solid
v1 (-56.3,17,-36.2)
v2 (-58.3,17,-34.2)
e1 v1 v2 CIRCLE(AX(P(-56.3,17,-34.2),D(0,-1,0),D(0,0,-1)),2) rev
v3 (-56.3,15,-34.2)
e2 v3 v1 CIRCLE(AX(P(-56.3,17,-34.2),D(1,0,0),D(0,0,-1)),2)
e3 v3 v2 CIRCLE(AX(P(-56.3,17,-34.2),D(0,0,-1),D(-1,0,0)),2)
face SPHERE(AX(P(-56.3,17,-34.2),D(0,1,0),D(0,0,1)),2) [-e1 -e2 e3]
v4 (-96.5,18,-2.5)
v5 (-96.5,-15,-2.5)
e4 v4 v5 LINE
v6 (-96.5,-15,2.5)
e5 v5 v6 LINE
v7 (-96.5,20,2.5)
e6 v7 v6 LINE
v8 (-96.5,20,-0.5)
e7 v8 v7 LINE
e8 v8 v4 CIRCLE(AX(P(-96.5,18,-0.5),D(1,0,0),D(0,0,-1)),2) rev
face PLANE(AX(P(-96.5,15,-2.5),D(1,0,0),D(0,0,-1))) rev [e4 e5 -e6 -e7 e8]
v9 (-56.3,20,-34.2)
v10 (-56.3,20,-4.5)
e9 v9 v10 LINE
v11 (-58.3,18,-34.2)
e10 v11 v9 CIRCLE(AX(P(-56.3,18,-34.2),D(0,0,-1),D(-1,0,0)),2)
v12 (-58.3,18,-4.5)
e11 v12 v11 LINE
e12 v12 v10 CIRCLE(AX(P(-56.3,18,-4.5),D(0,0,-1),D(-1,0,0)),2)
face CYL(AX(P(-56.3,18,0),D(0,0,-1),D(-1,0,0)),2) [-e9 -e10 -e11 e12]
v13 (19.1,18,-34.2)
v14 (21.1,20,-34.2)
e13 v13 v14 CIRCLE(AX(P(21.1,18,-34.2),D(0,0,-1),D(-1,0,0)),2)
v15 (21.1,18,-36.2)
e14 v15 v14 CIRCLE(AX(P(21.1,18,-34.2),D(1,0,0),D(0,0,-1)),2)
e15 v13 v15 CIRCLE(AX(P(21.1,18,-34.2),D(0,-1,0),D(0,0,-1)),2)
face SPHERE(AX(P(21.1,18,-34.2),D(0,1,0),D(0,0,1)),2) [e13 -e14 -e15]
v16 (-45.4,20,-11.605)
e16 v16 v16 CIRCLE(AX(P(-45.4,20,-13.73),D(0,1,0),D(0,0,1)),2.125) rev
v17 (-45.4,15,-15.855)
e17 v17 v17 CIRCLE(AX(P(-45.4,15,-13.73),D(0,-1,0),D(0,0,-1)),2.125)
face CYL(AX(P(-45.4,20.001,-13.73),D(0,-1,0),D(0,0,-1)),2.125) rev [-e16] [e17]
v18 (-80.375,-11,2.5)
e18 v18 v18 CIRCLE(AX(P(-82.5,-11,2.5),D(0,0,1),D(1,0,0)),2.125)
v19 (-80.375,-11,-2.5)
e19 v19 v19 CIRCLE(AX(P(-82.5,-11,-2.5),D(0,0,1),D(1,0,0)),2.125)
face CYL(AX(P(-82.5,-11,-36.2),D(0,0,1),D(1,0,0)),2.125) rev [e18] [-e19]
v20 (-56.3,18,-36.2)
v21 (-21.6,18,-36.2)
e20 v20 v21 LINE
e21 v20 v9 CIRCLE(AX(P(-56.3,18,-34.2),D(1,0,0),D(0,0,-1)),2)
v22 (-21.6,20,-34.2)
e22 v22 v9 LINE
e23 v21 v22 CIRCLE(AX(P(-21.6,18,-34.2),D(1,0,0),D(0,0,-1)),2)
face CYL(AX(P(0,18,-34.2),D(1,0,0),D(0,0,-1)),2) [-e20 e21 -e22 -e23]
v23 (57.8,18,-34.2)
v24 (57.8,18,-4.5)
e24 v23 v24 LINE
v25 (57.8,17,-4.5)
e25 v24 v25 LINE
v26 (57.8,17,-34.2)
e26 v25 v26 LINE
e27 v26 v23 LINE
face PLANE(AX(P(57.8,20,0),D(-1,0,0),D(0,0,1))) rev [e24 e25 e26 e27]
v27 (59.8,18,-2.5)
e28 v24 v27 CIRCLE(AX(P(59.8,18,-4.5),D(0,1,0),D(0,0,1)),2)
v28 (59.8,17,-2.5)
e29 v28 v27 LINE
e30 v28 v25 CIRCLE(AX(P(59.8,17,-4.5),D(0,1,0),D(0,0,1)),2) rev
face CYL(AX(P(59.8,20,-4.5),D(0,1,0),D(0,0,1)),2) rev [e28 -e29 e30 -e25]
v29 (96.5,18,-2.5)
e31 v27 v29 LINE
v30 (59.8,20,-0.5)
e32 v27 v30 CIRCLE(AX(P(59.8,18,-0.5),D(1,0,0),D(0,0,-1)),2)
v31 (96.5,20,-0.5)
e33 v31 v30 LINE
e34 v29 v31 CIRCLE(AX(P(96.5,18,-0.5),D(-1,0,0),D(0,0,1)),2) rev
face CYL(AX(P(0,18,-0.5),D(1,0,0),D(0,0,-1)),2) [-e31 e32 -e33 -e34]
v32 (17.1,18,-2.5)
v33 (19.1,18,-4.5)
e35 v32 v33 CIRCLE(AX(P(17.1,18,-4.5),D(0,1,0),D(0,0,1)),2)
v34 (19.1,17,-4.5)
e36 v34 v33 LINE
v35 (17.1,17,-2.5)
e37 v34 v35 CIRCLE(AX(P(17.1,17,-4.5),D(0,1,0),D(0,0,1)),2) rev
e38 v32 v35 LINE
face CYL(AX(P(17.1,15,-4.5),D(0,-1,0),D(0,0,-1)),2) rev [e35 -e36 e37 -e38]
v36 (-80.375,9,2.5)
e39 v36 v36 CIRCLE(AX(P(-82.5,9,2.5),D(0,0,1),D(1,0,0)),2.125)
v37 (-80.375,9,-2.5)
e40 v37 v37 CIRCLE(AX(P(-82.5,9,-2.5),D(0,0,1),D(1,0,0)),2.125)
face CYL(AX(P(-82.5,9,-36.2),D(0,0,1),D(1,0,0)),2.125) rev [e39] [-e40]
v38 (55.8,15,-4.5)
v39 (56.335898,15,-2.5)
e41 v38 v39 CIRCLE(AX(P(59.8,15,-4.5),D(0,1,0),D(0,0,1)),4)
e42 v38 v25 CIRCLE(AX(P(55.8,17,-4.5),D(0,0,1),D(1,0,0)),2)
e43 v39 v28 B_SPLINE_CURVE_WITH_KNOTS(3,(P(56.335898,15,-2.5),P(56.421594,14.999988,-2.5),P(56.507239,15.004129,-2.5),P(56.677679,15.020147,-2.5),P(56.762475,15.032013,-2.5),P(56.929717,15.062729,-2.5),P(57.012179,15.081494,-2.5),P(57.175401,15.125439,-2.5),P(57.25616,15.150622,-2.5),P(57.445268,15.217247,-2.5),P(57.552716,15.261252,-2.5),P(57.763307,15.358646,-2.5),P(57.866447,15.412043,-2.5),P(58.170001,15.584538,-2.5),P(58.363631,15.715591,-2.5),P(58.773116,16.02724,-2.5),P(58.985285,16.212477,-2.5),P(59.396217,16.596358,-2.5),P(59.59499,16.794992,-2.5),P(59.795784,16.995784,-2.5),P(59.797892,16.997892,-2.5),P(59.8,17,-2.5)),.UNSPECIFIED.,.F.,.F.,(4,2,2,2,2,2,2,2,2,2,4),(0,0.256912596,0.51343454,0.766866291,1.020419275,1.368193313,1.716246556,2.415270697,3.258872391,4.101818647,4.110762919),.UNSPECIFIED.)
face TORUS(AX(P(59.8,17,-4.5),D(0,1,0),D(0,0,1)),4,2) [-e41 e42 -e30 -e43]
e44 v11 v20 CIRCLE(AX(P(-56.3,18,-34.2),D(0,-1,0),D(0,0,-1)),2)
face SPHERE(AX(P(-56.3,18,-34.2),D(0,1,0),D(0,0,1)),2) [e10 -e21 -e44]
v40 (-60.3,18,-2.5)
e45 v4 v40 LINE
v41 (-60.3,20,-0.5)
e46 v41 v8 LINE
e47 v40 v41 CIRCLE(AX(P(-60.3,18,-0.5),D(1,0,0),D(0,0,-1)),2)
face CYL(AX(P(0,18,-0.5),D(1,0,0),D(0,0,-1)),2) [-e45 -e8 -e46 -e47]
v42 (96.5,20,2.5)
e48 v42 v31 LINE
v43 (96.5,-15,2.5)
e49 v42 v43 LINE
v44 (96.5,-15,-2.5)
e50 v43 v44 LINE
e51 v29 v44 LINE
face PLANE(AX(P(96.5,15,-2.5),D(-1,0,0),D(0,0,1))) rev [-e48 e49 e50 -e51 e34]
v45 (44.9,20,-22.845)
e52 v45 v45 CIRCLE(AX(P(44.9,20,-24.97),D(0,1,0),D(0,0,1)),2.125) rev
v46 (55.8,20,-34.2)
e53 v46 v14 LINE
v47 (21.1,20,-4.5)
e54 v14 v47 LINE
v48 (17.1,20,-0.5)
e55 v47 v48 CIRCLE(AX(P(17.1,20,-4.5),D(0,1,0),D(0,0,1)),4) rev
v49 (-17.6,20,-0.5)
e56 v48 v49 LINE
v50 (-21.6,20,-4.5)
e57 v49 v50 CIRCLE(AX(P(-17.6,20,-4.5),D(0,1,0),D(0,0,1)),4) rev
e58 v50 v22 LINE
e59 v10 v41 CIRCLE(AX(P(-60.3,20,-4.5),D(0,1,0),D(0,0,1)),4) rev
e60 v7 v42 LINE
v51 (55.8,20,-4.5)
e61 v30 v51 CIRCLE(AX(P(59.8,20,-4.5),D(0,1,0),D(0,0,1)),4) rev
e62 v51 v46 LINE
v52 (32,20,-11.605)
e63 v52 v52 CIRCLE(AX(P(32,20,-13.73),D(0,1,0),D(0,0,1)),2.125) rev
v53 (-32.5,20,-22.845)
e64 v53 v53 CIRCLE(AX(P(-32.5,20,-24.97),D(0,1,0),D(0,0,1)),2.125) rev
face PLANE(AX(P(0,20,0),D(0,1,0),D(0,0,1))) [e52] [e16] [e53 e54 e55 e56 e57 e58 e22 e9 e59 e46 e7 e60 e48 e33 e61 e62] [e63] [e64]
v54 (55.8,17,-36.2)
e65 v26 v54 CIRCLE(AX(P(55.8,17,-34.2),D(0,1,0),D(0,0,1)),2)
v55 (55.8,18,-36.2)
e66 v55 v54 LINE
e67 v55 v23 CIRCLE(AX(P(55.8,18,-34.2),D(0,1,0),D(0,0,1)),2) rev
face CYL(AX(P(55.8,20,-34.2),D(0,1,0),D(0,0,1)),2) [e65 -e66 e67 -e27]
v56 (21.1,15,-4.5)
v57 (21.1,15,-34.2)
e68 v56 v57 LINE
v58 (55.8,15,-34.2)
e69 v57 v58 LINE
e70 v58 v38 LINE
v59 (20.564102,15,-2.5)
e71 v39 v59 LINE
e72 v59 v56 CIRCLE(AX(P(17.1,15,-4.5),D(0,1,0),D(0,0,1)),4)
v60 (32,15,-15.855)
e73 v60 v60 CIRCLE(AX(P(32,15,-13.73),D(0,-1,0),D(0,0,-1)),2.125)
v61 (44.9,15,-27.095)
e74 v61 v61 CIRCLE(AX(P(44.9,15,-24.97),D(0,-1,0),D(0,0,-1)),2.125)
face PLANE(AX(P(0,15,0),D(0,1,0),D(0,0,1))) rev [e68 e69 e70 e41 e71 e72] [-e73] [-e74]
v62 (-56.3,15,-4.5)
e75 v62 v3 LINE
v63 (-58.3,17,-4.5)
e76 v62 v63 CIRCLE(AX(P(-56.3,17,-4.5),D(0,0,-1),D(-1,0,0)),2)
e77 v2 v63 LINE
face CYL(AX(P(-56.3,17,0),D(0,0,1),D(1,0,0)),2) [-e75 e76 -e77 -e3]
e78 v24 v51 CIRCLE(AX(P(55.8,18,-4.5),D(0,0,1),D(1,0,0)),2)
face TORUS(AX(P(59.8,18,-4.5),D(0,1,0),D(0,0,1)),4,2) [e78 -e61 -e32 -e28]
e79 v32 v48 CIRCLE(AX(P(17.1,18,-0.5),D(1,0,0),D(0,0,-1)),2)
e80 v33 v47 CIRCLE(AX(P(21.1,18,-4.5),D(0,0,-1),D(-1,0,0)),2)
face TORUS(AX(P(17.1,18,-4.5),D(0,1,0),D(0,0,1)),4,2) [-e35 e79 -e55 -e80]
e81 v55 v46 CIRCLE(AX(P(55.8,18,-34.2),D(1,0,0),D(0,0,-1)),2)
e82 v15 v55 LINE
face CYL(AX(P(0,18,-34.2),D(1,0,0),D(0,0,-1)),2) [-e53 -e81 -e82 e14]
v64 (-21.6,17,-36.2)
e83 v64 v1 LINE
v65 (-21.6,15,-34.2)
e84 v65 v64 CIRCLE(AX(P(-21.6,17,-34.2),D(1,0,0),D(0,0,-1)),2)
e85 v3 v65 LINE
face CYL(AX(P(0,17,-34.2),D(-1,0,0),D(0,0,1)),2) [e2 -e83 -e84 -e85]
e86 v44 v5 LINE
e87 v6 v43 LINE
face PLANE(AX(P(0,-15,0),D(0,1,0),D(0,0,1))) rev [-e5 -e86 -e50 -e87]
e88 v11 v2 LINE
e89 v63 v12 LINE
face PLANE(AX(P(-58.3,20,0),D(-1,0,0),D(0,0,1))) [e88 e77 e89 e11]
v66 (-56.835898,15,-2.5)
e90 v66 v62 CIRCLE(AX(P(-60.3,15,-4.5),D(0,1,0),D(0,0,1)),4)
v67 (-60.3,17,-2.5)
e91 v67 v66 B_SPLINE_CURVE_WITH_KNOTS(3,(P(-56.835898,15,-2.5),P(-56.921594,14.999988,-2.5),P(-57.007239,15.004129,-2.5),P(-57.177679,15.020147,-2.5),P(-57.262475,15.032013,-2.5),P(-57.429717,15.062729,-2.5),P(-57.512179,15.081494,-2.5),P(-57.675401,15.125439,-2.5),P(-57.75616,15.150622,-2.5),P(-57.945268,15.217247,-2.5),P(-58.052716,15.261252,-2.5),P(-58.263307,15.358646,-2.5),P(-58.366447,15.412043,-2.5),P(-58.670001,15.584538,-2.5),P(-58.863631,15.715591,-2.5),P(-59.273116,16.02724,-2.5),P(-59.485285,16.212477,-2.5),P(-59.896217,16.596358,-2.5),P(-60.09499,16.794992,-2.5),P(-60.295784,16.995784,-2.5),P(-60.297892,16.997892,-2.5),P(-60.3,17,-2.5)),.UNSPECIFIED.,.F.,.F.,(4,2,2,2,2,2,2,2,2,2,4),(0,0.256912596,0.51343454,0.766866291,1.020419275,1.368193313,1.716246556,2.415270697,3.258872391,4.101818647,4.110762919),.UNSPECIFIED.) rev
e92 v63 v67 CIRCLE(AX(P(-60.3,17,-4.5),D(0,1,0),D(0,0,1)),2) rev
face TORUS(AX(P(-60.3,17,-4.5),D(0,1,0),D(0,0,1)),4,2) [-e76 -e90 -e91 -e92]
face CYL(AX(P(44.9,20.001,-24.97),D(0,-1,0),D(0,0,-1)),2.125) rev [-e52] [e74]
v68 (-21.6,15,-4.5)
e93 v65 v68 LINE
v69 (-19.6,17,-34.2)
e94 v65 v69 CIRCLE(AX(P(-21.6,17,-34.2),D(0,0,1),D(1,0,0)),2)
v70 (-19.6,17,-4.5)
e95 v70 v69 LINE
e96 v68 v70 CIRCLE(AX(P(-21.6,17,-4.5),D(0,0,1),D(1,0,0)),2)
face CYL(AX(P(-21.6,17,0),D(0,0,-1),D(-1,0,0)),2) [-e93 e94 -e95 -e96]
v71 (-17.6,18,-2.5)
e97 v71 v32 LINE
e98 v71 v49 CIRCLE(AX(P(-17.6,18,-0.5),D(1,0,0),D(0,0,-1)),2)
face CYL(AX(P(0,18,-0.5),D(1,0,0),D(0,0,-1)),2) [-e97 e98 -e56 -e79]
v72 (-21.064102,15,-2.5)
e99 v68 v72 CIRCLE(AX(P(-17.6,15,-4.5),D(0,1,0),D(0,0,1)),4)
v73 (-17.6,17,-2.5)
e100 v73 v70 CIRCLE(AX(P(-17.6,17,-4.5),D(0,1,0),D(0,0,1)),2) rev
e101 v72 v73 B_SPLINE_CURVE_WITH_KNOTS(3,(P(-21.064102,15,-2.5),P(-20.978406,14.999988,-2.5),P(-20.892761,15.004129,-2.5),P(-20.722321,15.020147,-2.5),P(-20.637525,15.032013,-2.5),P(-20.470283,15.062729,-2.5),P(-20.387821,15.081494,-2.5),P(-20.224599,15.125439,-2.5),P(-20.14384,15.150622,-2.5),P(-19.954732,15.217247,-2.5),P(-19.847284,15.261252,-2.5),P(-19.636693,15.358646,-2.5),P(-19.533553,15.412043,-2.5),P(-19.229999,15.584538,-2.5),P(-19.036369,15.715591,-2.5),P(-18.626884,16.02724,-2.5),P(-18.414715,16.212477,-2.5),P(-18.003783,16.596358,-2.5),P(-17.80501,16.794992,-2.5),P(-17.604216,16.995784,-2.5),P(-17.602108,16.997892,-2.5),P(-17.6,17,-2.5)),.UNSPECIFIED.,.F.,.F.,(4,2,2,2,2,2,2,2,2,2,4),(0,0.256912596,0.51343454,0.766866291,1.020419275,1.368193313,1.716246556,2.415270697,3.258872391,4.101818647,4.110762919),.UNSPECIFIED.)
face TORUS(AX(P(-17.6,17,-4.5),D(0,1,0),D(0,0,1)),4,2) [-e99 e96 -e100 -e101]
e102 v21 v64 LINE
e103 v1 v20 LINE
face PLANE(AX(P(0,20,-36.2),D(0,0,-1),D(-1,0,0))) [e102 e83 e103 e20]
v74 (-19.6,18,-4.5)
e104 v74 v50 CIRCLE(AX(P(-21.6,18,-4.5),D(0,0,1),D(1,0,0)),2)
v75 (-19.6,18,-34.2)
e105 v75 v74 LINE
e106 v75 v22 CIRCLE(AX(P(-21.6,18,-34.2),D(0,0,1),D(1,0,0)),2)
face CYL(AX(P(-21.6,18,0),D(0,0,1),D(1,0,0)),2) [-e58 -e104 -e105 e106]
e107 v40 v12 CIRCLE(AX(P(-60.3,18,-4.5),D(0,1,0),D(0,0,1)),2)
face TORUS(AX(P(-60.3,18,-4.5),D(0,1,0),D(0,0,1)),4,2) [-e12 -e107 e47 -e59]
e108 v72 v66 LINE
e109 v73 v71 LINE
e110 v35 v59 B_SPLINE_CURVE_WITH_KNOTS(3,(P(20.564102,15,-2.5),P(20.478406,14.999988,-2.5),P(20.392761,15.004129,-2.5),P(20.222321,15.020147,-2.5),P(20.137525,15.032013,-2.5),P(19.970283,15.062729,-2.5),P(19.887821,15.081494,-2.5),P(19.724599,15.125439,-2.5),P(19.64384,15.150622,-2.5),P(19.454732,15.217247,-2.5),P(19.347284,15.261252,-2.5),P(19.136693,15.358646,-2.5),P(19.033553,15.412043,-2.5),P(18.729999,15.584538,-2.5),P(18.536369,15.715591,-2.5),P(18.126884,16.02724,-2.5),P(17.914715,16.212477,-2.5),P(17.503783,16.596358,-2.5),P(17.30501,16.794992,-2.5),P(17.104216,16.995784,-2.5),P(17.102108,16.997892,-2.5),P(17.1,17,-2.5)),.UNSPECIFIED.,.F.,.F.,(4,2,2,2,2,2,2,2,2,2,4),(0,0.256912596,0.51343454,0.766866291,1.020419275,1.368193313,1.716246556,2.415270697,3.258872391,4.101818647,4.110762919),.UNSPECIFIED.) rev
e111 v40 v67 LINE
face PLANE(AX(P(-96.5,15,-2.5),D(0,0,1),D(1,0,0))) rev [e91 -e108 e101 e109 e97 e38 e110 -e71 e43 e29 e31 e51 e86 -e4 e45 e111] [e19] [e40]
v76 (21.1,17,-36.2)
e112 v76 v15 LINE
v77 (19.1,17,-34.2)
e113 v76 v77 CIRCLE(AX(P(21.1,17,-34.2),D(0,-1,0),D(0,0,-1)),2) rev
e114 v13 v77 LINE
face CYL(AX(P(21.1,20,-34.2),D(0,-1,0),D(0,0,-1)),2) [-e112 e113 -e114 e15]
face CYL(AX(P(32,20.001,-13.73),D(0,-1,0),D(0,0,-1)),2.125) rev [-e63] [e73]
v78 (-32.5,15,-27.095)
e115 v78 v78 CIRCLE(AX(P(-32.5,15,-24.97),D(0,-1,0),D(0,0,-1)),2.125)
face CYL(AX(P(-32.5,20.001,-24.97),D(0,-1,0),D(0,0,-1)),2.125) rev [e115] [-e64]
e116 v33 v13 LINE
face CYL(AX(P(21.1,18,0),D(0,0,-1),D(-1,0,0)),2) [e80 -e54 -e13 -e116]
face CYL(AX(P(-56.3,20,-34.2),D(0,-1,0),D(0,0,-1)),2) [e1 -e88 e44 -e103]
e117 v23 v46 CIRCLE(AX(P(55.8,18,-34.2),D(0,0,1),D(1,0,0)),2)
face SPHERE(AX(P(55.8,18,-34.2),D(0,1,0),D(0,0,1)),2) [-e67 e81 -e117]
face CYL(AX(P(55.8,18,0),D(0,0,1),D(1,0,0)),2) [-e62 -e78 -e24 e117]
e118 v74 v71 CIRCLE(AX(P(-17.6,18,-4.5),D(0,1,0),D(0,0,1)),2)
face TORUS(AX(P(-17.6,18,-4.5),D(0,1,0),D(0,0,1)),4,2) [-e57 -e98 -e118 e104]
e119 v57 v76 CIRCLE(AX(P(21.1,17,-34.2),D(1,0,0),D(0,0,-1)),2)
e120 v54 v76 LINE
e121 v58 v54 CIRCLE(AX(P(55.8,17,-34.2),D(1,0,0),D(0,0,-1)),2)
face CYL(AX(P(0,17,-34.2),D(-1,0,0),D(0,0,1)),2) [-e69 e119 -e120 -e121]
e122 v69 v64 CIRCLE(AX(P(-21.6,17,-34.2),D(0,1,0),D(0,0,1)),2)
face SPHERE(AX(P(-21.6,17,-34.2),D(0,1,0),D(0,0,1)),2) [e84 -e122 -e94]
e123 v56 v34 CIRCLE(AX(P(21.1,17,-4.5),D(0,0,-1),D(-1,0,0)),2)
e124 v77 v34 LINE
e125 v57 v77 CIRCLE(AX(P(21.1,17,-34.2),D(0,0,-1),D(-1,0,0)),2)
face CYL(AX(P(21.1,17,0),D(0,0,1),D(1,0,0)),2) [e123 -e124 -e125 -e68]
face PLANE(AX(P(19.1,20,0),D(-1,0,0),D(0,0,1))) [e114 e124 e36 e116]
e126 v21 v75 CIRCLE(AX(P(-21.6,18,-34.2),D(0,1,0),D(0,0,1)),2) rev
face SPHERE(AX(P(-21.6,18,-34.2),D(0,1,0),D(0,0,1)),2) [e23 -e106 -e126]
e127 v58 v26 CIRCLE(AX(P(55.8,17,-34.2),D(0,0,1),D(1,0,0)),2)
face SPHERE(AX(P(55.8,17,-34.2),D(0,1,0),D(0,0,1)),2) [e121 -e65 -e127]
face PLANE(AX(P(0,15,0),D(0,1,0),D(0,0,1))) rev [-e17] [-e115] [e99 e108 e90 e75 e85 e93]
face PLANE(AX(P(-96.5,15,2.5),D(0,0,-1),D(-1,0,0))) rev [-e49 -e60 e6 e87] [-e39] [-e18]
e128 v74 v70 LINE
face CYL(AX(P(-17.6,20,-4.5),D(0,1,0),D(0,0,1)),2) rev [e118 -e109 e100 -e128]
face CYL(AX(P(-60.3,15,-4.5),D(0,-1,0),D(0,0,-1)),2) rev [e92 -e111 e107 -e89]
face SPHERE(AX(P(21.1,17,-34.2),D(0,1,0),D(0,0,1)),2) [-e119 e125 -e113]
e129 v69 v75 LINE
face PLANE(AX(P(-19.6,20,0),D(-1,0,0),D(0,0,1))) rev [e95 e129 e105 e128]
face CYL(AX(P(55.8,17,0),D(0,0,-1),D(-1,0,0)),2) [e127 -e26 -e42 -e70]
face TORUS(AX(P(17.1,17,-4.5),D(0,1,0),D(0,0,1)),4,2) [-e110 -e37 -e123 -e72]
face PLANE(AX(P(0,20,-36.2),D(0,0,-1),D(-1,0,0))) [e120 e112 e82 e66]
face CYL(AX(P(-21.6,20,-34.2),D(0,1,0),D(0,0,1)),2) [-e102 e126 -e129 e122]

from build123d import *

# Parameters (mm, degrees)
SKETCH1_W           = 193
SKETCH1_H           = 5
BOSS_EXTRUDE1_DEPTH = 15
BOSS_EXTRUDE2_DEPTH = 5
CUT_EXTRUDE1_REACH  = 109.344
SKETCH3_R           = 2.125
FILLET3_R           = 2
FILLET4_R           = 2
SKETCH4_R           = 2.125
CUT_EXTRUDE2_DEPTH  = 106.877004204


with BuildPart() as part:
    # Sketch1 → Boss-Extrude1 (new, symmetric)
    with BuildSketch(Plane(origin=(0, 0, 0), x_dir=(1, 0, 0), z_dir=(0, 1, 0))):
        Rectangle(SKETCH1_W, SKETCH1_H)
    extrude(amount=BOSS_EXTRUDE1_DEPTH, both=True)

    # Sketch2 → Boss-Extrude2 (add)
    with BuildSketch(Plane(origin=(0, 15, 0), x_dir=(1, 0, 0), z_dir=(0, 1, 0))):
        Polygon((-58.3, 36.2), (-58.3, 2.5), (-96.5, 2.5), (-96.5, -2.5), (96.5, -2.5), (96.5, 2.5), (57.8, 2.5), (57.8, 36.2), (19.1, 36.2), (19.1, 2.5), (-19.6, 2.5), (-19.6, 36.2), align=None)
    extrude(amount=BOSS_EXTRUDE2_DEPTH)

    # Sketch3 → Cut-Extrude1 (cut, up to next)
    with BuildSketch(Plane.XZ.offset(-15), mode=Mode.PRIVATE) as cut_extrude1_sk1:
        with Locations(Location((-45.4, -13.73, 0), (0, 0, 270))):
            Circle(SKETCH3_R)
    cut_extrude1_tool1 = extrude(cut_extrude1_sk1.sketch, amount=-CUT_EXTRUDE1_REACH, mode=Mode.PRIVATE) & part.part
    # Sketch3 → Cut-Extrude1 (cut, up to next)
    with BuildSketch(Plane.XZ.offset(-15), mode=Mode.PRIVATE) as cut_extrude1_sk2:
        with Locations(Location((-32.5, -24.97, 0), (0, 0, 270))):
            Circle(SKETCH3_R)
    cut_extrude1_tool2 = extrude(cut_extrude1_sk2.sketch, amount=-CUT_EXTRUDE1_REACH, mode=Mode.PRIVATE) & part.part
    # Sketch3 → Cut-Extrude1 (cut, up to next)
    with BuildSketch(Plane.XZ.offset(-15), mode=Mode.PRIVATE) as cut_extrude1_sk3:
        with Locations(Location((32, -13.73, 0), (0, 0, 270))):
            Circle(SKETCH3_R)
    cut_extrude1_tool3 = extrude(cut_extrude1_sk3.sketch, amount=-CUT_EXTRUDE1_REACH, mode=Mode.PRIVATE) & part.part
    # Sketch3 → Cut-Extrude1 (cut, up to next)
    with BuildSketch(Plane.XZ.offset(-15), mode=Mode.PRIVATE) as cut_extrude1_sk4:
        with Locations(Location((44.9, -24.97, 0), (0, 0, 270))):
            Circle(SKETCH3_R)
    cut_extrude1_tool4 = extrude(cut_extrude1_sk4.sketch, amount=-CUT_EXTRUDE1_REACH, mode=Mode.PRIVATE) & part.part
    add(cut_extrude1_tool1.solids().sort_by_distance((-45.4, 15, -13.73))[0], mode=Mode.SUBTRACT)
    add(cut_extrude1_tool2.solids().sort_by_distance((-32.5, 15, -24.97))[0], mode=Mode.SUBTRACT)
    add(cut_extrude1_tool3.solids().sort_by_distance((32, 15, -13.73))[0], mode=Mode.SUBTRACT)
    add(cut_extrude1_tool4.solids().sort_by_distance((44.9, 15, -24.97))[0], mode=Mode.SUBTRACT)

    # Fillet3
    fillet3_edges = [part.edges().sort_by_distance(p)[0] for p in [
        (-58.3, 17.5, -36.2),
        (-58.3, 17.5, -2.5),
        (57.8, 17.5, -2.5),
        (57.8, 17.5, -36.2),
        (19.1, 17.5, -36.2),
        (19.1, 17.5, -2.5),
        (-19.6, 17.5, -2.5),
        (-19.6, 17.5, -36.2),
    ]]
    fillet(fillet3_edges, radius=FILLET3_R)

    # Fillet4
    # the kernel refuses this fillet: 2 mm, written as the material it takes off along each edge
    with BuildSketch(Plane(origin=(21.1, 20, -34.2), x_dir=(-1, 0, 0), z_dir=(0, 0, 1))) as fillet4_piece_1:
        with BuildLine():
            CenterArc((2 - FILLET4_R, FILLET4_R), FILLET4_R, 270, 90)
            Line((2 - FILLET4_R, 0), (2, 0))
            Line((2, 0), (2, FILLET4_R))
        make_face()
    revolve(axis=Axis((21.1, 20, -34.2), (0, -1, 0)), revolution_arc=90, mode=Mode.SUBTRACT)
    with BuildSketch(Plane(origin=(-21.6, 20, -34.2), x_dir=(1, 0, 0), z_dir=(0, 0, 1))) as fillet4_piece_2:
        with BuildLine():
            CenterArc((2 - FILLET4_R, -FILLET4_R), FILLET4_R, 0, 90)
            Line((2 - FILLET4_R, 0), (2, 0))
            Line((2, 0), (2, -FILLET4_R))
        make_face()
    revolve(axis=Axis((-21.6, 20, -34.2), (0, 1, 0)), revolution_arc=90, mode=Mode.SUBTRACT)
    with BuildSketch(Plane(origin=(-56.3, 20, -34.2), x_dir=(-1, 0, 0), z_dir=(0, 0, 1))) as fillet4_piece_3:
        with BuildLine():
            CenterArc((2 - FILLET4_R, FILLET4_R), FILLET4_R, 270, 90)
            Line((2 - FILLET4_R, 0), (2, 0))
            Line((2, 0), (2, FILLET4_R))
        make_face()
    revolve(axis=Axis((-56.3, 20, -34.2), (0, -1, 0)), revolution_arc=90, mode=Mode.SUBTRACT)
    with BuildSketch(Plane(origin=(19.1, 15, -34.2), x_dir=(0, 1, 0), z_dir=(0, 0, 1)), Plane(origin=(57.8, 15, -4.5), x_dir=(0, 1, 0), z_dir=(0, 0, -1)), Plane(origin=(-19.6, 15, -4.5), x_dir=(0, 1, 0), z_dir=(0, 0, -1)), Plane(origin=(-58.3, 15, -34.2), x_dir=(0, 1, 0), z_dir=(0, 0, 1))) as fillet4_piece_4:
        with BuildLine():
            CenterArc((FILLET4_R, -FILLET4_R), FILLET4_R, 90, 90)
            Line((0, -FILLET4_R), (0, 0))
            Line((0, 0), (FILLET4_R, 0))
        make_face()
    extrude(amount=29.7, mode=Mode.SUBTRACT)
    with BuildSketch(Plane(origin=(55.8, 15, -36.2), x_dir=(0, 1, 0), z_dir=(-1, 0, 0)), Plane(origin=(-21.6, 15, -36.2), x_dir=(0, 1, 0), z_dir=(-1, 0, 0))) as fillet4_piece_5:
        with BuildLine():
            CenterArc((FILLET4_R, -FILLET4_R), FILLET4_R, 90, 90)
            Line((0, -FILLET4_R), (0, 0))
            Line((0, 0), (FILLET4_R, 0))
        make_face()
    extrude(amount=34.7, mode=Mode.SUBTRACT)
    with BuildSketch(Plane(origin=(55.8, 15, -34.2), x_dir=(1, 0, 0), z_dir=(0, 0, 1))) as fillet4_piece_6:
        with BuildLine():
            CenterArc((2 - FILLET4_R, FILLET4_R), FILLET4_R, 270, 90)
            Line((2 - FILLET4_R, 0), (2, 0))
            Line((2, 0), (2, FILLET4_R))
        make_face()
    revolve(axis=Axis((55.8, 15, -34.2), (0, 1, 0)), revolution_arc=90, mode=Mode.SUBTRACT)
    with BuildSketch(Plane(origin=(21.1, 15, -34.2), x_dir=(-1, 0, 0), z_dir=(0, 0, 1))) as fillet4_piece_7:
        with BuildLine():
            CenterArc((2 - FILLET4_R, -FILLET4_R), FILLET4_R, 0, 90)
            Line((2 - FILLET4_R, 0), (2, 0))
            Line((2, 0), (2, -FILLET4_R))
        make_face()
    revolve(axis=Axis((21.1, 15, -34.2), (0, -1, 0)), revolution_arc=90, mode=Mode.SUBTRACT)
    with BuildSketch(Plane(origin=(-17.6, 15, -4.5), x_dir=(0.5976672776328267, 0, -0.8017442392976488), z_dir=(-0.8017442392976488, 0, -0.5976672776328267))) as fillet4_piece_8_section:
        with BuildLine():
            CenterArc((2 + FILLET4_R, -FILLET4_R), FILLET4_R, 90, 90)
            Line((2, -FILLET4_R), (2, 0))
            Line((2, 0), (2 + FILLET4_R, 0))
        make_face()
    fillet4_piece_8 = revolve(axis=Axis((-17.6, 15, -4.5), (0, -1, 0)), revolution_arc=233.296989237, mode=Mode.PRIVATE)
    fillet4_piece_8 = split(fillet4_piece_8, bisect_by=Plane(origin=(-19.099877837, 15.623256941, -2.5), z_dir=(0, 0, -1)), keep=Keep.TOP, mode=Mode.PRIVATE)
    add(fillet4_piece_8, mode=Mode.SUBTRACT)
    with BuildSketch(Plane(origin=(-17.6, 20, -4.5), x_dir=(0, 0, 1), z_dir=(1, 0, 0))) as fillet4_piece_9:
        with BuildLine():
            CenterArc((2 + FILLET4_R, FILLET4_R), FILLET4_R, 180, 90)
            Line((2 + FILLET4_R, 0), (2, 0))
            Line((2, 0), (2, FILLET4_R))
        make_face()
    revolve(axis=Axis((-17.6, 20, -4.5), (0, -1, 0)), revolution_arc=90, mode=Mode.SUBTRACT)
    with BuildSketch(Plane(origin=(-60.3, 15, -4.5), x_dir=(-0.5976672776328267, 0, -0.8017442392976488), z_dir=(0.8017442392976488, 0, -0.5976672776328267))) as fillet4_piece_10_section:
        with BuildLine():
            CenterArc((2 + FILLET4_R, FILLET4_R), FILLET4_R, 180, 90)
            Line((2 + FILLET4_R, 0), (2, 0))
            Line((2, 0), (2, FILLET4_R))
        make_face()
    fillet4_piece_10 = revolve(axis=Axis((-60.3, 15, -4.5), (0, 1, 0)), revolution_arc=233.296989237, mode=Mode.PRIVATE)
    fillet4_piece_10 = split(fillet4_piece_10, bisect_by=Plane(origin=(-58.800122111, 15.623256622, -2.5), z_dir=(0, 0, -1)), keep=Keep.TOP, mode=Mode.PRIVATE)
    add(fillet4_piece_10, mode=Mode.SUBTRACT)
    with BuildSketch(Plane(origin=(-60.3, 20, -4.5), x_dir=(0, 0, 1), z_dir=(-1, 0, 0))) as fillet4_piece_11:
        with BuildLine():
            CenterArc((2 + FILLET4_R, -FILLET4_R), FILLET4_R, 90, 90)
            Line((2 + FILLET4_R, 0), (2, 0))
            Line((2, 0), (2, -FILLET4_R))
        make_face()
    revolve(axis=Axis((-60.3, 20, -4.5), (0, 1, 0)), revolution_arc=90, mode=Mode.SUBTRACT)
    with BuildSketch(Plane(origin=(17.1, 15, -4.5), x_dir=(-0.5976672776328281, 0, -0.8017442392976479), z_dir=(0.8017442392976479, 0, -0.5976672776328281))) as fillet4_piece_12_section:
        with BuildLine():
            CenterArc((2 + FILLET4_R, FILLET4_R), FILLET4_R, 180, 90)
            Line((2 + FILLET4_R, 0), (2, 0))
            Line((2, 0), (2, FILLET4_R))
        make_face()
    fillet4_piece_12 = revolve(axis=Axis((17.1, 15, -4.5), (0, 1, 0)), revolution_arc=233.296989237, mode=Mode.PRIVATE)
    fillet4_piece_12 = split(fillet4_piece_12, bisect_by=Plane(origin=(18.599877909, 15.623256541, -2.5), z_dir=(0, 0, -1)), keep=Keep.TOP, mode=Mode.PRIVATE)
    add(fillet4_piece_12, mode=Mode.SUBTRACT)
    with BuildSketch(Plane(origin=(17.1, 20, -4.5), x_dir=(0, 0, 1), z_dir=(-1, 0, 0))) as fillet4_piece_13:
        with BuildLine():
            CenterArc((2 + FILLET4_R, -FILLET4_R), FILLET4_R, 90, 90)
            Line((2 + FILLET4_R, 0), (2, 0))
            Line((2, 0), (2, -FILLET4_R))
        make_face()
    revolve(axis=Axis((17.1, 20, -4.5), (0, 1, 0)), revolution_arc=90, mode=Mode.SUBTRACT)
    with BuildSketch(Plane(origin=(59.8, 15, -4.5), x_dir=(0.5976672776328267, 0, -0.8017442392976488), z_dir=(-0.8017442392976488, 0, -0.5976672776328267))) as fillet4_piece_14_section:
        with BuildLine():
            CenterArc((2 + FILLET4_R, -FILLET4_R), FILLET4_R, 90, 90)
            Line((2, -FILLET4_R), (2, 0))
            Line((2, 0), (2 + FILLET4_R, 0))
        make_face()
    fillet4_piece_14 = revolve(axis=Axis((59.8, 15, -4.5), (0, -1, 0)), revolution_arc=233.296989237, mode=Mode.PRIVATE)
    fillet4_piece_14 = split(fillet4_piece_14, bisect_by=Plane(origin=(58.300122152, 15.623256947, -2.5), z_dir=(0, 0, -1)), keep=Keep.TOP, mode=Mode.PRIVATE)
    add(fillet4_piece_14, mode=Mode.SUBTRACT)
    with BuildSketch(Plane(origin=(59.8, 20, -4.5), x_dir=(0, 0, 1), z_dir=(1, 0, 0))) as fillet4_piece_15:
        with BuildLine():
            CenterArc((2 + FILLET4_R, FILLET4_R), FILLET4_R, 180, 90)
            Line((2 + FILLET4_R, 0), (2, 0))
            Line((2, 0), (2, FILLET4_R))
        make_face()
    revolve(axis=Axis((59.8, 20, -4.5), (0, -1, 0)), revolution_arc=90, mode=Mode.SUBTRACT)
    with BuildSketch(Plane(origin=(101.5, 20, -2.5), x_dir=(0, -1, 0), z_dir=(-1, 0, 0))) as fillet4_piece_16:
        with BuildLine():
            CenterArc((FILLET4_R, FILLET4_R), FILLET4_R, 180, 90)
            Line((0, FILLET4_R), (0, 0))
            Line((0, 0), (FILLET4_R, 0))
        make_face()
    extrude(amount=41.7, mode=Mode.SUBTRACT)
    with BuildSketch(Plane(origin=(-19.6, 20, -4.5), x_dir=(0, -1, 0), z_dir=(0, 0, -1)), Plane(origin=(-58.3, 20, -34.2), x_dir=(0, -1, 0), z_dir=(0, 0, 1)), Plane(origin=(57.8, 20, -4.5), x_dir=(0, -1, 0), z_dir=(0, 0, -1)), Plane(origin=(19.1, 20, -34.2), x_dir=(0, -1, 0), z_dir=(0, 0, 1))) as fillet4_piece_17:
        with BuildLine():
            CenterArc((FILLET4_R, FILLET4_R), FILLET4_R, 180, 90)
            Line((0, FILLET4_R), (0, 0))
            Line((0, 0), (FILLET4_R, 0))
        make_face()
    extrude(amount=29.7, mode=Mode.SUBTRACT)
    with BuildSketch(Plane(origin=(-60.3, 20, -2.5), x_dir=(0, -1, 0), z_dir=(-1, 0, 0))) as fillet4_piece_18:
        with BuildLine():
            CenterArc((FILLET4_R, FILLET4_R), FILLET4_R, 180, 90)
            Line((0, FILLET4_R), (0, 0))
            Line((0, 0), (FILLET4_R, 0))
        make_face()
    extrude(amount=41.2, mode=Mode.SUBTRACT)
    with BuildSketch(Plane(origin=(17.1, 20, -2.5), x_dir=(0, -1, 0), z_dir=(-1, 0, 0)), Plane(origin=(-21.6, 20, -36.2), x_dir=(0, -1, 0), z_dir=(-1, 0, 0)), Plane(origin=(55.8, 20, -36.2), x_dir=(0, -1, 0), z_dir=(-1, 0, 0))) as fillet4_piece_19:
        with BuildLine():
            CenterArc((FILLET4_R, FILLET4_R), FILLET4_R, 180, 90)
            Line((0, FILLET4_R), (0, 0))
            Line((0, 0), (FILLET4_R, 0))
        make_face()
    extrude(amount=34.7, mode=Mode.SUBTRACT)
    with BuildSketch(Plane(origin=(-21.6, 15, -34.2), x_dir=(1, 0, 0), z_dir=(0, 0, 1))) as fillet4_piece_20:
        with BuildLine():
            CenterArc((2 - FILLET4_R, FILLET4_R), FILLET4_R, 270, 90)
            Line((2 - FILLET4_R, 0), (2, 0))
            Line((2, 0), (2, FILLET4_R))
        make_face()
    revolve(axis=Axis((-21.6, 15, -34.2), (0, 1, 0)), revolution_arc=90, mode=Mode.SUBTRACT)
    with BuildSketch(Plane(origin=(-56.3, 15, -34.2), x_dir=(-1, 0, 0), z_dir=(0, 0, 1))) as fillet4_piece_21:
        with BuildLine():
            CenterArc((2 - FILLET4_R, -FILLET4_R), FILLET4_R, 0, 90)
            Line((2 - FILLET4_R, 0), (2, 0))
            Line((2, 0), (2, -FILLET4_R))
        make_face()
    revolve(axis=Axis((-56.3, 15, -34.2), (0, -1, 0)), revolution_arc=90, mode=Mode.SUBTRACT)
    with BuildSketch(Plane(origin=(55.8, 20, -34.2), x_dir=(1, 0, 0), z_dir=(0, 0, 1))) as fillet4_piece_22:
        with BuildLine():
            CenterArc((2 - FILLET4_R, -FILLET4_R), FILLET4_R, 0, 90)
            Line((2 - FILLET4_R, 0), (2, 0))
            Line((2, 0), (2, -FILLET4_R))
        make_face()
    revolve(axis=Axis((55.8, 20, -34.2), (0, 1, 0)), revolution_arc=90, mode=Mode.SUBTRACT)

    # Sketch4 → Cut-Extrude2 (cut, through all)
    with BuildSketch(Plane.XY.offset(2.5)):
        with Locations((-82.5, 9)):
            Circle(SKETCH4_R)
        with Locations((-82.5, -11)):
            Circle(SKETCH4_R)
    extrude(amount=-CUT_EXTRUDE2_DEPTH, mode=Mode.SUBTRACT)


solid = part.part
